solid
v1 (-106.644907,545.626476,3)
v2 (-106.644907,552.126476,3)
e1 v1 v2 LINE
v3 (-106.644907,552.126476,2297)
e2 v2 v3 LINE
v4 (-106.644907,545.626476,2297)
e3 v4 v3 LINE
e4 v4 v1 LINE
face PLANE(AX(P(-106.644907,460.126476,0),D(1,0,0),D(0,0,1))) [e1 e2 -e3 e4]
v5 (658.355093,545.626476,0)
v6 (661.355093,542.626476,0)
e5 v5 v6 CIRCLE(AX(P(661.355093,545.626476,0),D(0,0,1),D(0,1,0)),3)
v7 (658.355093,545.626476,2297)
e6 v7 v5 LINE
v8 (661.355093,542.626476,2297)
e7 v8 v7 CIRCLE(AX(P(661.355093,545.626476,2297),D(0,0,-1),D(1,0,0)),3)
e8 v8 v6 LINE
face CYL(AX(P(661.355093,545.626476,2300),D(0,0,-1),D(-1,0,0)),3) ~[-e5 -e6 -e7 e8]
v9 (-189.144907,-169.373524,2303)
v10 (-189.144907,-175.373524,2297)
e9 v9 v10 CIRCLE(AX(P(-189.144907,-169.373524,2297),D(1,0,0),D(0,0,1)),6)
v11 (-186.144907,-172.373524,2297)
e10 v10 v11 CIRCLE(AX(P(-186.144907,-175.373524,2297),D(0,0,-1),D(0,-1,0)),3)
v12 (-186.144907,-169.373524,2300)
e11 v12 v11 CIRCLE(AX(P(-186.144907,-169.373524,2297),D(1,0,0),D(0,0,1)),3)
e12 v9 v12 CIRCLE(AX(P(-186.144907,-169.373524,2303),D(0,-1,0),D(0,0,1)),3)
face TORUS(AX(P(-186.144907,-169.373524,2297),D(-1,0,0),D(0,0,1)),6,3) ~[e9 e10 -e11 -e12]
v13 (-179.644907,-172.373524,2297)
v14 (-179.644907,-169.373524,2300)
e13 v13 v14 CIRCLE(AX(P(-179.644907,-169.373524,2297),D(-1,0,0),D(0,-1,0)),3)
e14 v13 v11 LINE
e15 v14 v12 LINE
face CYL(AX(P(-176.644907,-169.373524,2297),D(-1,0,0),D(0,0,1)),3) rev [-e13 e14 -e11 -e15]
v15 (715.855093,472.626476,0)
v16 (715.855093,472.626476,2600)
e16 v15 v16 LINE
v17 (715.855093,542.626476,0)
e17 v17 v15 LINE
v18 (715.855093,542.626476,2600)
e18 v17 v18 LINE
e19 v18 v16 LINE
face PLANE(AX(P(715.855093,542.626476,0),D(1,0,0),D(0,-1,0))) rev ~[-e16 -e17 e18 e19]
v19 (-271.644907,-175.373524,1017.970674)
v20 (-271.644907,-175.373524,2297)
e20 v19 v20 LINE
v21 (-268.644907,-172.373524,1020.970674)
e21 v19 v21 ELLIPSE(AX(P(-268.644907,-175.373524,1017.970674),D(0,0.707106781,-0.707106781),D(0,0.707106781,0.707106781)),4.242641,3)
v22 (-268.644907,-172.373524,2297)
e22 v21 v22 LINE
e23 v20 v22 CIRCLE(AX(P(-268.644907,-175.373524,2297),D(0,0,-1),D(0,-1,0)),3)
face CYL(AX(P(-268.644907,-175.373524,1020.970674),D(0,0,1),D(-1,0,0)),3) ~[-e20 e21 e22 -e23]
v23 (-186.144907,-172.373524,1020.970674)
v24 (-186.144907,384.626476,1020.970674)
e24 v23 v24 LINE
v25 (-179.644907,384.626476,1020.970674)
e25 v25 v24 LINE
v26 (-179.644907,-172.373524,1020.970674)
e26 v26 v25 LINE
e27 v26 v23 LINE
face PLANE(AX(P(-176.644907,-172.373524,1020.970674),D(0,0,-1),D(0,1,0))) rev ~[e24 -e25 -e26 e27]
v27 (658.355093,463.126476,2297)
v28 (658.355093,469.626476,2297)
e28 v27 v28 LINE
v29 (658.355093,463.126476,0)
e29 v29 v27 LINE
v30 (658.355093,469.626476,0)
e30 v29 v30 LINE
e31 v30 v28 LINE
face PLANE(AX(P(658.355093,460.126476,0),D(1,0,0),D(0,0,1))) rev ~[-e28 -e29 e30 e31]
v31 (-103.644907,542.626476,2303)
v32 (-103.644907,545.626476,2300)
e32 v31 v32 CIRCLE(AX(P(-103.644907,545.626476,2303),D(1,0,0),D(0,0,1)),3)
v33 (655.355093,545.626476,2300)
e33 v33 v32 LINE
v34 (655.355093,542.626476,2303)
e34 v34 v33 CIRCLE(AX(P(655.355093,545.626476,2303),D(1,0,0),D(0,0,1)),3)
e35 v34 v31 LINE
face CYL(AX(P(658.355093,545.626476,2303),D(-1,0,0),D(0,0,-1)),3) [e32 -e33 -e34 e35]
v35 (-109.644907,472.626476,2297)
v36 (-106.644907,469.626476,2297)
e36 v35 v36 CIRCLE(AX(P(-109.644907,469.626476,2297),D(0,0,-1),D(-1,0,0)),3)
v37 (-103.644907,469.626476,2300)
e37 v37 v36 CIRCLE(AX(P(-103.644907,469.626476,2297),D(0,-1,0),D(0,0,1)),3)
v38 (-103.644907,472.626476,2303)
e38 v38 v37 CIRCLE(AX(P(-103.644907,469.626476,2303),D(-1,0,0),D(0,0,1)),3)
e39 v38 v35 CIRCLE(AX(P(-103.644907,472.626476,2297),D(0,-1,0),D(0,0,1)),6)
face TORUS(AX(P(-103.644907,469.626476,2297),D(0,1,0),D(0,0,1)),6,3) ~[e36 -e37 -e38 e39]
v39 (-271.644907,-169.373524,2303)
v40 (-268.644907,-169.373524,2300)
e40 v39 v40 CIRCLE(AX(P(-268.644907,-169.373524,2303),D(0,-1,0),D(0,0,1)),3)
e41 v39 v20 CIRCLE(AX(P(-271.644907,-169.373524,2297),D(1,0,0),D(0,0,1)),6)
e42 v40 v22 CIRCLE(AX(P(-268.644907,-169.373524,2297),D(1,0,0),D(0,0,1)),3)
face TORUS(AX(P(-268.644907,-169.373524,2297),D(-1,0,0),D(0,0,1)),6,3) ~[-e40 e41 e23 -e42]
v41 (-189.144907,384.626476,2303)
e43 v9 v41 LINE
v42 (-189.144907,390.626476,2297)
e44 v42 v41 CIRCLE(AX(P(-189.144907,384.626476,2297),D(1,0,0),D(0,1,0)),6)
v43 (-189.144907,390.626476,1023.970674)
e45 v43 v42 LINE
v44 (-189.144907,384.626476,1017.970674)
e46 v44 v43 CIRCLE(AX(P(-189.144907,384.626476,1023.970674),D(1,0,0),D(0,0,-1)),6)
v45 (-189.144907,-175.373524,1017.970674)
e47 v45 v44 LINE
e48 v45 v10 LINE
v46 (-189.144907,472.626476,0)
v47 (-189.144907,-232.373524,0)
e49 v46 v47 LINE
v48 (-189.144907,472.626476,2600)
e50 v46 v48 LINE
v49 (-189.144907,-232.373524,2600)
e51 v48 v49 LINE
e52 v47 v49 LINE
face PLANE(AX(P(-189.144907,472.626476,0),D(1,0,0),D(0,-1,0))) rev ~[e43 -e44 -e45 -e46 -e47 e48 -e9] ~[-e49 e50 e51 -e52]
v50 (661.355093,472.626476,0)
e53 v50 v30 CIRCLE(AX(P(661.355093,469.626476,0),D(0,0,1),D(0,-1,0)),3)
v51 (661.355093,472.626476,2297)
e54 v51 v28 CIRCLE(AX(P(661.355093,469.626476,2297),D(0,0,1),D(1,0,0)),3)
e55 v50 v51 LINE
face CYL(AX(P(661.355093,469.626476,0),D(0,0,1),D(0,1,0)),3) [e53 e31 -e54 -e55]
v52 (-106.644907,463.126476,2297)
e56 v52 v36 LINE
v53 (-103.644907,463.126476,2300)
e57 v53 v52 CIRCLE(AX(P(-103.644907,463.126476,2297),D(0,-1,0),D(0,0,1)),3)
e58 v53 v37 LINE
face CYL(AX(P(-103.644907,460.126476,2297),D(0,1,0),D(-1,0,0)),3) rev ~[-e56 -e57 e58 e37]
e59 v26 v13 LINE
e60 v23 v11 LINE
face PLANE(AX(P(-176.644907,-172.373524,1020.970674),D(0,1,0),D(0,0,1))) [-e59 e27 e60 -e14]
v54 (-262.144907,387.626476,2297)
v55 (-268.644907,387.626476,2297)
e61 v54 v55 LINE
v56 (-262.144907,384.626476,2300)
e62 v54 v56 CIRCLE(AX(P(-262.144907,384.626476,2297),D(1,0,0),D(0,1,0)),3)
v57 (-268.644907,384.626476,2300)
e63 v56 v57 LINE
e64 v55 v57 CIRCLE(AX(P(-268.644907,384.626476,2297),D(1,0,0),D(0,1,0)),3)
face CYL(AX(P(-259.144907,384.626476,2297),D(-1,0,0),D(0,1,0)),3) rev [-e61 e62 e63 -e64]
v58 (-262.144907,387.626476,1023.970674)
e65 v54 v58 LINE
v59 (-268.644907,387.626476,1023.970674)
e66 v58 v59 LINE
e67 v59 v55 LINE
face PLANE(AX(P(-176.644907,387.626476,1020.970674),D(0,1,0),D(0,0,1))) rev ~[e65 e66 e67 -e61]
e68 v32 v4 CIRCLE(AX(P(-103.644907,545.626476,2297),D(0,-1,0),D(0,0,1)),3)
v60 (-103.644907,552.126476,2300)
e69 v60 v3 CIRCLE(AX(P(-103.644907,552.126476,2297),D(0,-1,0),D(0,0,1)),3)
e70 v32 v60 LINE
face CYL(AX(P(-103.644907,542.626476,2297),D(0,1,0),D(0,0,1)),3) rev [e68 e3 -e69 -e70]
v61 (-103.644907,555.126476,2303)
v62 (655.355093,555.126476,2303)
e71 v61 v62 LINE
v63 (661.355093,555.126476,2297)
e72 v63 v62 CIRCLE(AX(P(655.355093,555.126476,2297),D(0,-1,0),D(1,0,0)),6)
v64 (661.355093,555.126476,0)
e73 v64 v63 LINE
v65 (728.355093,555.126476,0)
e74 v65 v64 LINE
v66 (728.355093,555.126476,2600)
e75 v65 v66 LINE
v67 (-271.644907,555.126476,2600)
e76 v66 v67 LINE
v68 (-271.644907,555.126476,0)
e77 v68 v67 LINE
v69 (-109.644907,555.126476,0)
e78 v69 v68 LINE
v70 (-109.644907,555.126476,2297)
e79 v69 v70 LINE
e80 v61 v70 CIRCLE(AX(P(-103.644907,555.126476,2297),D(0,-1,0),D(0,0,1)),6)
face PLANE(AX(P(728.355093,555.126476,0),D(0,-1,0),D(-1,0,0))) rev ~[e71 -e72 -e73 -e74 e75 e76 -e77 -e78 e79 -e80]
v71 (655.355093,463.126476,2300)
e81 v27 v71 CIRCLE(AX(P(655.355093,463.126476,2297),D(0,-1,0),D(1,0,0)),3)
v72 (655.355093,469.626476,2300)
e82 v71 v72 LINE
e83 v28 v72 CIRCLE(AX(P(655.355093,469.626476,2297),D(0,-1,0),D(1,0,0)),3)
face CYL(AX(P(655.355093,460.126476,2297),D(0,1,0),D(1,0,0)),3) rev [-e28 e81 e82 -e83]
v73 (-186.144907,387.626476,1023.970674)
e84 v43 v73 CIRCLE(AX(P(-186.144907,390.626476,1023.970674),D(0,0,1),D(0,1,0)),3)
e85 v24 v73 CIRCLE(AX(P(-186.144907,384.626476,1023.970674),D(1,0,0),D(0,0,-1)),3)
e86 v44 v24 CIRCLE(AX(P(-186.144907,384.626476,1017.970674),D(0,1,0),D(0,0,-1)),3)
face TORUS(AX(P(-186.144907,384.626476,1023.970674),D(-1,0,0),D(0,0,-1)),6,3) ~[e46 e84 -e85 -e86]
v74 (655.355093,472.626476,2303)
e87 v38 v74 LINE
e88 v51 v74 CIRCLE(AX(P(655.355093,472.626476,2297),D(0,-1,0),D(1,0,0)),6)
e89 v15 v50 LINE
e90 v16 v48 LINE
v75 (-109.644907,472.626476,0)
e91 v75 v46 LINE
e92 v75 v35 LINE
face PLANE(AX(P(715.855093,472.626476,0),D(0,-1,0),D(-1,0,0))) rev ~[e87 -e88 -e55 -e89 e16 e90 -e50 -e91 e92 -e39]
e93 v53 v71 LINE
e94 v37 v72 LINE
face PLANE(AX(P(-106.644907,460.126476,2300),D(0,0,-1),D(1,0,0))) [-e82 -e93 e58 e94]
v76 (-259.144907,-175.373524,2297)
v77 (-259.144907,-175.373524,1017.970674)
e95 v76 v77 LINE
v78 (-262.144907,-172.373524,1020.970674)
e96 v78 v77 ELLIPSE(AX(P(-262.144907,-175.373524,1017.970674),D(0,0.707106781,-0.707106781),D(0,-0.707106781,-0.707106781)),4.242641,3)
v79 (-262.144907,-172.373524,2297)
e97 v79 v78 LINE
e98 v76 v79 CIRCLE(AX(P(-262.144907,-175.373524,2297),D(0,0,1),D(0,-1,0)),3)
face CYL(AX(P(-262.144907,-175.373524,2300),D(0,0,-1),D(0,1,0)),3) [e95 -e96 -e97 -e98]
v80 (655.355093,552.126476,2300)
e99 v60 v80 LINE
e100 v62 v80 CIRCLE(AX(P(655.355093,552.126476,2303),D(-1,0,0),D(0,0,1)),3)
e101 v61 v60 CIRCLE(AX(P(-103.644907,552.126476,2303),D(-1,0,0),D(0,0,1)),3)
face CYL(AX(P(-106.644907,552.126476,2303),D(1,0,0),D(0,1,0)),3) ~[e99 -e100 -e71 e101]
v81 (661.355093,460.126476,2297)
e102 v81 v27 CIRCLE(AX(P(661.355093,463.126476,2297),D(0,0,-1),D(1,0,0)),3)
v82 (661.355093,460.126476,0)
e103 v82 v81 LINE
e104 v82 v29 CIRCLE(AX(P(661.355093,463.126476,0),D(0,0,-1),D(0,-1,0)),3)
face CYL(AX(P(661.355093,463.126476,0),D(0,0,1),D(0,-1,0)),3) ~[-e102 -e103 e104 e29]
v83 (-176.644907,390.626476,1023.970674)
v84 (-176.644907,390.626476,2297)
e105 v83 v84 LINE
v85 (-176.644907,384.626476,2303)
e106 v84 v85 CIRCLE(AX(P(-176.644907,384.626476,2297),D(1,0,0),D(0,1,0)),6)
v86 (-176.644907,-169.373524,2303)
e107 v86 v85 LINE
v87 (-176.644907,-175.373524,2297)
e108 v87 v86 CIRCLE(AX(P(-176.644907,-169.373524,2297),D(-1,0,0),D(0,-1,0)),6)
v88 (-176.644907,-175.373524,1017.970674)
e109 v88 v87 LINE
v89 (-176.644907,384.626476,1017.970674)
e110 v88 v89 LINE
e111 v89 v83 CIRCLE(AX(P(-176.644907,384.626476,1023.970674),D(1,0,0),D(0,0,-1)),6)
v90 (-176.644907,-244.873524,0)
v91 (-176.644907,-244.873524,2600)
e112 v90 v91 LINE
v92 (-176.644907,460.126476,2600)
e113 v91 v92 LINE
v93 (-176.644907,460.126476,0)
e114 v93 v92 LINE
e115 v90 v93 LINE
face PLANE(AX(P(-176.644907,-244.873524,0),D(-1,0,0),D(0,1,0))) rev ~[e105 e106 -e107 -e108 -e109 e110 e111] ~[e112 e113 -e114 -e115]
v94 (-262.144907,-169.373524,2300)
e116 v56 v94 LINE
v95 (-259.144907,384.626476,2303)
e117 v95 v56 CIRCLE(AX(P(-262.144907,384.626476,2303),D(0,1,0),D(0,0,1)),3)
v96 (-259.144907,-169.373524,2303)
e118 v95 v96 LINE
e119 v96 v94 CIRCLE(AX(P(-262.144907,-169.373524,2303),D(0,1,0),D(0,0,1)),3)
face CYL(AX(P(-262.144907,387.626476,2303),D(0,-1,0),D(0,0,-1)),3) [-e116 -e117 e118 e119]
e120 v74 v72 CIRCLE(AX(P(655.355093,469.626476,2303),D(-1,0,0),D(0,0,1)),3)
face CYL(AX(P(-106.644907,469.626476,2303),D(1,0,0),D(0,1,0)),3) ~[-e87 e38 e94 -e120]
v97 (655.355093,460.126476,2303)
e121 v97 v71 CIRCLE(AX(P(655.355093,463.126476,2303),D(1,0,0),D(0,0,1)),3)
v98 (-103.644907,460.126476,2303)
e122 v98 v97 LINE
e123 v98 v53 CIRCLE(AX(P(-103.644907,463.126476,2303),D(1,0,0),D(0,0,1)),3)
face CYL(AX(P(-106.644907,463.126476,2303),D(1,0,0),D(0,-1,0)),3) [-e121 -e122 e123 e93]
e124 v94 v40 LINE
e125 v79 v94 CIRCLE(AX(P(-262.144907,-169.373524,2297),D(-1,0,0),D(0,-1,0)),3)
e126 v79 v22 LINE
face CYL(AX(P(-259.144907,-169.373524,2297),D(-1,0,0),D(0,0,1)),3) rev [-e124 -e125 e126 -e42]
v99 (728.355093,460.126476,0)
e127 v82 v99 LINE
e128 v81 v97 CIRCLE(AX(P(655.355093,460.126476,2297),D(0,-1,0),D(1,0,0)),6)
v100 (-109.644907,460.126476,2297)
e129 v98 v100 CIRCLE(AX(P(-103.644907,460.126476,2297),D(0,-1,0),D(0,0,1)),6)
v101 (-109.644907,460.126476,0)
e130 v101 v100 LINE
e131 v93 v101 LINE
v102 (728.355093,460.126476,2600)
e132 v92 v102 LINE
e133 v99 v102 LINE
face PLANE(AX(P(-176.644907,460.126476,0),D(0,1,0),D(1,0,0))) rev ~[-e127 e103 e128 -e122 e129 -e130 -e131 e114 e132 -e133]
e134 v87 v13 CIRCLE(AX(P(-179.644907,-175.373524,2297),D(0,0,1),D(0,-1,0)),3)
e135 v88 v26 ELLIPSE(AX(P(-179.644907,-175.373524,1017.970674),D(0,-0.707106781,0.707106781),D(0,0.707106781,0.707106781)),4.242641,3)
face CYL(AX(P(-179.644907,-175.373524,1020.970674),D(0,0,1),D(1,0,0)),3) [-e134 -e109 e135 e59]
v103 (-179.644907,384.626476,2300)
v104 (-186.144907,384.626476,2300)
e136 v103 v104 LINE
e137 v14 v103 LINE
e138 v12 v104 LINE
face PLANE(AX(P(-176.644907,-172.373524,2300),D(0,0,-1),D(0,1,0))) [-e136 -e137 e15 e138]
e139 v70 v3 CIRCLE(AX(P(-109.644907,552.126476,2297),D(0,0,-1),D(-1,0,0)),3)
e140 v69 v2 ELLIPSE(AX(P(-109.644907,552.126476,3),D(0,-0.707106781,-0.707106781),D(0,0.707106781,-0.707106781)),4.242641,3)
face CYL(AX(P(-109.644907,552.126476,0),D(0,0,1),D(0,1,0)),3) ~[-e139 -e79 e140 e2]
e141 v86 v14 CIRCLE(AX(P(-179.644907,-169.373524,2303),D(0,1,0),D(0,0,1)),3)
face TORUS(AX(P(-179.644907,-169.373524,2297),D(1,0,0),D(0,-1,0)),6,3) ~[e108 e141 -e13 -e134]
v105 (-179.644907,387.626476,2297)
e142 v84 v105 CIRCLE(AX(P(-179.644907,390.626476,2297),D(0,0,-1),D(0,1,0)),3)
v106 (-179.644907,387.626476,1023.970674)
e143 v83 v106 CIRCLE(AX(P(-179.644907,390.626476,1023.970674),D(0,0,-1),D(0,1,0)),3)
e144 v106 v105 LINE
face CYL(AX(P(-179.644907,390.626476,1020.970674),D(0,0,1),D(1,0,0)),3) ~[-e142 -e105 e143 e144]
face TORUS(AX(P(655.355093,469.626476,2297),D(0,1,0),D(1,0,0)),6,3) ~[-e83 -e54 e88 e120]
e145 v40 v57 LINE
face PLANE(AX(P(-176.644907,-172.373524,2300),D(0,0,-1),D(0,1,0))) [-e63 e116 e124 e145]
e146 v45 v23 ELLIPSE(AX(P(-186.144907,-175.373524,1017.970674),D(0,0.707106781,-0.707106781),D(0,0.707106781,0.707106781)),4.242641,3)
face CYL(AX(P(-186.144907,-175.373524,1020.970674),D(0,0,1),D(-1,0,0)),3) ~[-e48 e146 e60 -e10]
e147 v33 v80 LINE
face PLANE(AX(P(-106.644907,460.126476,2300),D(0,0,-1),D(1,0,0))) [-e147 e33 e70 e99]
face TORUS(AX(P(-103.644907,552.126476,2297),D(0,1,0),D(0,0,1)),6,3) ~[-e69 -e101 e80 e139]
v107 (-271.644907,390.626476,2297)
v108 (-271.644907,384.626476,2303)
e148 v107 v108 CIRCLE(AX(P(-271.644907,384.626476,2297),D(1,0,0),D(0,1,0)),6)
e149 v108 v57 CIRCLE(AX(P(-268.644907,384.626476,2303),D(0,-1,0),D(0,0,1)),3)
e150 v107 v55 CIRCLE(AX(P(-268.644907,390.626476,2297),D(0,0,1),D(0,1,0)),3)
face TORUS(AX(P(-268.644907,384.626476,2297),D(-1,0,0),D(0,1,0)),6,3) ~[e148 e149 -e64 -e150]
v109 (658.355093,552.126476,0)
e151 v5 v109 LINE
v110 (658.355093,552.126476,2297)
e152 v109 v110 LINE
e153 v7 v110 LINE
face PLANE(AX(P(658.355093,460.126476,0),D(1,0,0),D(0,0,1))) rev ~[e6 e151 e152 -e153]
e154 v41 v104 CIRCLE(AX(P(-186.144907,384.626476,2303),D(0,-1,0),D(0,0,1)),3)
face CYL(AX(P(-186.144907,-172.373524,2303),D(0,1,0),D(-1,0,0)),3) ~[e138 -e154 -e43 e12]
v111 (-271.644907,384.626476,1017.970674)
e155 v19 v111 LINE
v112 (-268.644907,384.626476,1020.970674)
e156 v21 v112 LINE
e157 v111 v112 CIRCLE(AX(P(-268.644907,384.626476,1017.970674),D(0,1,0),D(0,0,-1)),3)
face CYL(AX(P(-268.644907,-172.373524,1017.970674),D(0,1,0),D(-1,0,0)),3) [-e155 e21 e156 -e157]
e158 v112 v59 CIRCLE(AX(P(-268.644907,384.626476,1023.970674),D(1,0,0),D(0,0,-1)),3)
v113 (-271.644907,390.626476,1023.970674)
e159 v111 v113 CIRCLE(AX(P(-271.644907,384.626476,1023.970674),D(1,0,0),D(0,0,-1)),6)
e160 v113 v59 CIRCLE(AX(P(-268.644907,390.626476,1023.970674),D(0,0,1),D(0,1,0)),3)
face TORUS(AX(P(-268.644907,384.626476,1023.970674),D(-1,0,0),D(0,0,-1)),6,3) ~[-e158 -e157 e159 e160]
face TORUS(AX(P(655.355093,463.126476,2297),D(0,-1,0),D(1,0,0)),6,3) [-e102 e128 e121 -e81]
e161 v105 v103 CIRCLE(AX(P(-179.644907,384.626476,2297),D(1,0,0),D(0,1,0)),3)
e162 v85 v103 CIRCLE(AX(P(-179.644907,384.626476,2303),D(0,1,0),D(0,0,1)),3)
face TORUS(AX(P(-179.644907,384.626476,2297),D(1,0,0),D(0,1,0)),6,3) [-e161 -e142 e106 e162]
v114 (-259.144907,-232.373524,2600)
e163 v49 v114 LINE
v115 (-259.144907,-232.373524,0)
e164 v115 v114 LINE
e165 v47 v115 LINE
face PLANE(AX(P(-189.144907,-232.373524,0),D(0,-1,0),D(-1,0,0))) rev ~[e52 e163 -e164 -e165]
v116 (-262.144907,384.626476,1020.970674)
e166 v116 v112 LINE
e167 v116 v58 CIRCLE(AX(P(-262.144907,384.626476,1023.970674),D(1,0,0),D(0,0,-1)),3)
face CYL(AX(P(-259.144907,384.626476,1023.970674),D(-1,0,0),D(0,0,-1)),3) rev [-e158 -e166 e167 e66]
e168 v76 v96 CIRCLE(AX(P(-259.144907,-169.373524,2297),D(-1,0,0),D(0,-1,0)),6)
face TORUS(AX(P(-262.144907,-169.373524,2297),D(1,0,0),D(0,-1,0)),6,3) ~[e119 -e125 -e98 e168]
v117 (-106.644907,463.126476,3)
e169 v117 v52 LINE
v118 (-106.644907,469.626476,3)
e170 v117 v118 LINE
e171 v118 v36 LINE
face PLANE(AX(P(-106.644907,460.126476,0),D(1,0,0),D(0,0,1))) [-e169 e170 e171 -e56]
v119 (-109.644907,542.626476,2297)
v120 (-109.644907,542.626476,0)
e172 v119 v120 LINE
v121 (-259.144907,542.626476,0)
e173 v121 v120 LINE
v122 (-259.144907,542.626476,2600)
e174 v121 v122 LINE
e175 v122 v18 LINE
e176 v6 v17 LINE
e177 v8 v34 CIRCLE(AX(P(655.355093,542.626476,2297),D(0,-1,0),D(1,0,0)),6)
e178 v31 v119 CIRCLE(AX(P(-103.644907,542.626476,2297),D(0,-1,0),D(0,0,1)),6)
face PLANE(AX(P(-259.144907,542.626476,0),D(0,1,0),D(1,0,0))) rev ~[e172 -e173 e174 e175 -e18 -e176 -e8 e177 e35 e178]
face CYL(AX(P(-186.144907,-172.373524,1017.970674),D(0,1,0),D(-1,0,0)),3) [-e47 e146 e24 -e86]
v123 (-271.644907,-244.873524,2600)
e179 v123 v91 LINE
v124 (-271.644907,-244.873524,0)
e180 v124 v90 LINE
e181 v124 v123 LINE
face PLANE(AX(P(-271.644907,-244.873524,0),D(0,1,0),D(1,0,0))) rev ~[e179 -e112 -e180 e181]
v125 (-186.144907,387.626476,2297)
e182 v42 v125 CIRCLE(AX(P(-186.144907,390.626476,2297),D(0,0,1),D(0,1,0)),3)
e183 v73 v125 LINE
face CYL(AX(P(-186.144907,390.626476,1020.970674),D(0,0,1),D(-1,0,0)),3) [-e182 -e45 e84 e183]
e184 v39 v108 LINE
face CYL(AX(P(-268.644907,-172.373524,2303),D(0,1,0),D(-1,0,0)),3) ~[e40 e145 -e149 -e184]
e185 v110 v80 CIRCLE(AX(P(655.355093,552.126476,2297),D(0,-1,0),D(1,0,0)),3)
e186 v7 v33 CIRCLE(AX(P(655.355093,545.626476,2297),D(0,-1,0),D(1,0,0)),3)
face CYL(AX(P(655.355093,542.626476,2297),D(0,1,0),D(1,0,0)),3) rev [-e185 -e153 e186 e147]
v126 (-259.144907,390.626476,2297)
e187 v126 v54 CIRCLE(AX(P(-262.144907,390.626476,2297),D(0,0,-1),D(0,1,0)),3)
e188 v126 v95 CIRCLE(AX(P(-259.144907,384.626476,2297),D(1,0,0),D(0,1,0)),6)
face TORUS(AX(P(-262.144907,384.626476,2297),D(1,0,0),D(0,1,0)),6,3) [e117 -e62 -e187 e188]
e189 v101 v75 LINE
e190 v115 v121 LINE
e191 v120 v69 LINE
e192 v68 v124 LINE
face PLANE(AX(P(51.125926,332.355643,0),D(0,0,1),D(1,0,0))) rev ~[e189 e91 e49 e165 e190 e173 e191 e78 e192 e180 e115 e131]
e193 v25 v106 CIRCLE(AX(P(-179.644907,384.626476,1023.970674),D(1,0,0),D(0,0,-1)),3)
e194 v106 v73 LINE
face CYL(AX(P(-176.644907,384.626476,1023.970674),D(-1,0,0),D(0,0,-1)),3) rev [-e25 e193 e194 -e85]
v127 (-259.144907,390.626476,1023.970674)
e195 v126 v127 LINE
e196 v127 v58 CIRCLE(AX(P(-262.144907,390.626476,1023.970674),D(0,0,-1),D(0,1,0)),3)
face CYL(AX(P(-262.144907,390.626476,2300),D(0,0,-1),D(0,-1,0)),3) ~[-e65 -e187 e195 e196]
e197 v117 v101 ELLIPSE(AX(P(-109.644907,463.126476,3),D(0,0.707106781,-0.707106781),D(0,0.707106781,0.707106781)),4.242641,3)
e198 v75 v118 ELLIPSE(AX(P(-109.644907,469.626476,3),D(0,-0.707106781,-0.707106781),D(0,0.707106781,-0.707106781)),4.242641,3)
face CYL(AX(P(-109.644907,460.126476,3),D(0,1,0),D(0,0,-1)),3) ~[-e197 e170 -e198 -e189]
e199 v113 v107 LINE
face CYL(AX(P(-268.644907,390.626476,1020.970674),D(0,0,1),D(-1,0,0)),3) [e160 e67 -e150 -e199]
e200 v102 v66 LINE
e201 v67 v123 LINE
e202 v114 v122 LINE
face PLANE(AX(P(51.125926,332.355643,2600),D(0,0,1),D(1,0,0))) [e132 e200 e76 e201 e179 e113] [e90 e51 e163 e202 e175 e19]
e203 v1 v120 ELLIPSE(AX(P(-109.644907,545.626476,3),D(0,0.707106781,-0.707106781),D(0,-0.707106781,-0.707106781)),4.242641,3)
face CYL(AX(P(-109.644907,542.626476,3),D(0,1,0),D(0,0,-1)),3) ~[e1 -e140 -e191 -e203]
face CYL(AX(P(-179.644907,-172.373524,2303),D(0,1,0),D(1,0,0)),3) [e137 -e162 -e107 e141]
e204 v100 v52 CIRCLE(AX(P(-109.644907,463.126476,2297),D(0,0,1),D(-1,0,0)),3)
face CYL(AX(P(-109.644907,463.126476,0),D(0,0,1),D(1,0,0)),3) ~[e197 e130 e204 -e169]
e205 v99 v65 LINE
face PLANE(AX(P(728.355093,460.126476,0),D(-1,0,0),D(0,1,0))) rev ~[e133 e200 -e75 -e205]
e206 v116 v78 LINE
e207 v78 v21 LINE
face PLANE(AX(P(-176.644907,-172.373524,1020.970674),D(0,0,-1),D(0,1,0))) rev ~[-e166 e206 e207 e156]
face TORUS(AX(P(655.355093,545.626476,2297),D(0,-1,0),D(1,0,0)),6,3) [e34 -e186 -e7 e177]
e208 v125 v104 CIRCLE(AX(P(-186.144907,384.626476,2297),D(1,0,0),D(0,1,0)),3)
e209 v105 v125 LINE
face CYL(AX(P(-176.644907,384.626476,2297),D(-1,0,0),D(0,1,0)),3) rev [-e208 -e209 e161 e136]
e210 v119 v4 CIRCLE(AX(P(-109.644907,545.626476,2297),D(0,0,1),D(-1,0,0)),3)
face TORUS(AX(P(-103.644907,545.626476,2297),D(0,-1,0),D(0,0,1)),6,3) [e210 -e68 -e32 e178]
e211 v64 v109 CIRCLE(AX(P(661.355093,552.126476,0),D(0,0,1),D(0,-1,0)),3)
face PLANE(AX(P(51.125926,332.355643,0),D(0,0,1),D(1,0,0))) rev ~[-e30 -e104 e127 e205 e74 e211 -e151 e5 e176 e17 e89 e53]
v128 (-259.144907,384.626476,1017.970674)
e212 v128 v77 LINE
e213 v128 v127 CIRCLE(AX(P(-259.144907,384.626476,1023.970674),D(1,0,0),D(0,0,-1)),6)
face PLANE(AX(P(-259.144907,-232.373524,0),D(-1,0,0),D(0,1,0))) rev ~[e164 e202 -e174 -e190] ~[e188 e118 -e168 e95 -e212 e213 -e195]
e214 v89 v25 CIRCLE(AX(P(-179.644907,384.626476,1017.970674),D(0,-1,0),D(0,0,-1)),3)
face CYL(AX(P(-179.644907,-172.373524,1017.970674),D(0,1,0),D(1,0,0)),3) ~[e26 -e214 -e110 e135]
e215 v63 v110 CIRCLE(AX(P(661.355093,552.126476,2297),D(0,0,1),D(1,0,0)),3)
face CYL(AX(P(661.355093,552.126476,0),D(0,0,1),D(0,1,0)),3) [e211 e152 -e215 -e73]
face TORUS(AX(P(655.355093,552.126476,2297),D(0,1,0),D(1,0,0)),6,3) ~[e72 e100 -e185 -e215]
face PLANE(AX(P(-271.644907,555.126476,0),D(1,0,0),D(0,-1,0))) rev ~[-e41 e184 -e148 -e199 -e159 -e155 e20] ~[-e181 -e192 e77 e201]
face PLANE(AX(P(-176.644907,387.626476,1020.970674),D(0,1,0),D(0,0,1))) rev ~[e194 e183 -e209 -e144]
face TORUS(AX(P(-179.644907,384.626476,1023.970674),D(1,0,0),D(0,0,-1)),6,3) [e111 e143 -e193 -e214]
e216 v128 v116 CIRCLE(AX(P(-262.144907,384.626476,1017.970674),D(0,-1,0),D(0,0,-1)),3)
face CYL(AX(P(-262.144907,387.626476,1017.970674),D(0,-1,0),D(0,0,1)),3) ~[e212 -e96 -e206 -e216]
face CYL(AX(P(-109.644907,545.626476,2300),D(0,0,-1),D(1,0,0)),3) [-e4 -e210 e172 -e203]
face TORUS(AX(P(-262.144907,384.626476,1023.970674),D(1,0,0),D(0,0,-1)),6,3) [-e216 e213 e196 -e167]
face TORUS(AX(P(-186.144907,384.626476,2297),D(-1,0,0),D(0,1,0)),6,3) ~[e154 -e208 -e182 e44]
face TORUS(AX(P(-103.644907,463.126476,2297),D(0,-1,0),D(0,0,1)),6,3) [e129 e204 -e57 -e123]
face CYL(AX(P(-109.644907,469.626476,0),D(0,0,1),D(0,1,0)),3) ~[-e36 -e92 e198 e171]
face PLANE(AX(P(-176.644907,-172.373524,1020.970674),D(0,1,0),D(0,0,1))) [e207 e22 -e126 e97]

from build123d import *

# Parameters (mm, degrees)
F1_DEPTH = 2600
F2_W     = 560
F2_H     = 1279.0293264389
F3_DEPTH = 95.001
F4_W     = 765
F4_H     = 2300
F5_DEPTH = 95.001
F6_R     = 3


with BuildPart() as f1:
    # F0 (on Top) → F1 (new body)
    with BuildSketch(Plane.XY):
        Polygon((-271.6449069816, 555.1264761336), (-271.6449069816, -244.8735238664), (-176.6449069816, -244.8735238664), (-176.6449069816, 460.1264761336), (728.3550930184, 460.1264761336), (728.3550930184, 555.1264761336), align=None)
        Polygon((-259.1449069816, 542.6264761336), (715.8550930184, 542.6264761336), (715.8550930184, 472.6264761336), (-189.1449069816, 472.6264761336), (-189.1449069816, -232.3735238664), (-259.1449069816, -232.3735238664), align=None, mode=Mode.SUBTRACT)
    extrude(amount=F1_DEPTH)

    # F2 (on face) → F3 (cut, through all)
    with BuildSketch(Plane.YZ.offset(-176.6449069816)):
        with Locations((107.6264761336, 1660.4853367805)):
            Rectangle(F2_W, F2_H)
    extrude(amount=-F3_DEPTH, mode=Mode.SUBTRACT)

    # F4 (on face) → F5 (cut, through all)
    with BuildSketch(Plane.XZ.offset(-460.1264761336)):
        with Locations((275.8550930184, 1150)):
            Rectangle(F4_W, F4_H)
    extrude(amount=-F5_DEPTH, mode=Mode.SUBTRACT)

    # F6
    f6_edges = [f1.edges().sort_by_distance(p)[0] for p in [
        (-106.644907, 542.626476, 1150),
        (-106.644907, 548.876476, 0),
        (-106.644907, 555.126476, 1150),
        (-106.644907, 548.876476, 2300),
        (-106.644907, 460.126476, 1150),
        (-106.644907, 466.376476, 0),
        (-106.644907, 472.626476, 1150),
        (-106.644907, 466.376476, 2300),
        (275.855093, 542.626476, 2300),
        (275.855093, 555.126476, 2300),
        (658.355093, 548.876476, 2300),
        (275.855093, 460.126476, 2300),
        (275.855093, 472.626476, 2300),
        (658.355093, 466.376476, 2300),
        (-259.144907, 107.626476, 2300),
        (-265.394907, -172.373524, 2300),
        (-271.644907, 107.626476, 2300),
        (-265.394907, 387.626476, 2300),
        (-176.644907, 107.626476, 2300),
        (-182.894907, -172.373524, 2300),
        (-189.144907, 107.626476, 2300),
        (-182.894907, 387.626476, 2300),
        (-259.144907, 387.626476, 1660.485337),
        (-271.644907, 387.626476, 1660.485337),
        (-265.394907, 387.626476, 1020.970674),
        (-176.644907, 387.626476, 1660.485337),
        (-189.144907, 387.626476, 1660.485337),
        (-182.894907, 387.626476, 1020.970674),
        (-271.644907, -172.373524, 1660.485337),
        (-271.644907, 107.626476, 1020.970674),
        (658.355093, 555.126476, 1150),
        (-259.144907, -172.373524, 1660.485337),
        (-259.144907, 107.626476, 1020.970674),
        (658.355093, 542.626476, 1150),
        (-189.144907, -172.373524, 1660.485337),
        (-189.144907, 107.626476, 1020.970674),
        (658.355093, 472.626476, 1150),
        (658.355093, 460.126476, 1150),
        (-176.644907, 107.626476, 1020.970674),
        (-176.644907, -172.373524, 1660.485337),
    ]]
    fillet(f6_edges, radius=F6_R)


solid = f1.part
